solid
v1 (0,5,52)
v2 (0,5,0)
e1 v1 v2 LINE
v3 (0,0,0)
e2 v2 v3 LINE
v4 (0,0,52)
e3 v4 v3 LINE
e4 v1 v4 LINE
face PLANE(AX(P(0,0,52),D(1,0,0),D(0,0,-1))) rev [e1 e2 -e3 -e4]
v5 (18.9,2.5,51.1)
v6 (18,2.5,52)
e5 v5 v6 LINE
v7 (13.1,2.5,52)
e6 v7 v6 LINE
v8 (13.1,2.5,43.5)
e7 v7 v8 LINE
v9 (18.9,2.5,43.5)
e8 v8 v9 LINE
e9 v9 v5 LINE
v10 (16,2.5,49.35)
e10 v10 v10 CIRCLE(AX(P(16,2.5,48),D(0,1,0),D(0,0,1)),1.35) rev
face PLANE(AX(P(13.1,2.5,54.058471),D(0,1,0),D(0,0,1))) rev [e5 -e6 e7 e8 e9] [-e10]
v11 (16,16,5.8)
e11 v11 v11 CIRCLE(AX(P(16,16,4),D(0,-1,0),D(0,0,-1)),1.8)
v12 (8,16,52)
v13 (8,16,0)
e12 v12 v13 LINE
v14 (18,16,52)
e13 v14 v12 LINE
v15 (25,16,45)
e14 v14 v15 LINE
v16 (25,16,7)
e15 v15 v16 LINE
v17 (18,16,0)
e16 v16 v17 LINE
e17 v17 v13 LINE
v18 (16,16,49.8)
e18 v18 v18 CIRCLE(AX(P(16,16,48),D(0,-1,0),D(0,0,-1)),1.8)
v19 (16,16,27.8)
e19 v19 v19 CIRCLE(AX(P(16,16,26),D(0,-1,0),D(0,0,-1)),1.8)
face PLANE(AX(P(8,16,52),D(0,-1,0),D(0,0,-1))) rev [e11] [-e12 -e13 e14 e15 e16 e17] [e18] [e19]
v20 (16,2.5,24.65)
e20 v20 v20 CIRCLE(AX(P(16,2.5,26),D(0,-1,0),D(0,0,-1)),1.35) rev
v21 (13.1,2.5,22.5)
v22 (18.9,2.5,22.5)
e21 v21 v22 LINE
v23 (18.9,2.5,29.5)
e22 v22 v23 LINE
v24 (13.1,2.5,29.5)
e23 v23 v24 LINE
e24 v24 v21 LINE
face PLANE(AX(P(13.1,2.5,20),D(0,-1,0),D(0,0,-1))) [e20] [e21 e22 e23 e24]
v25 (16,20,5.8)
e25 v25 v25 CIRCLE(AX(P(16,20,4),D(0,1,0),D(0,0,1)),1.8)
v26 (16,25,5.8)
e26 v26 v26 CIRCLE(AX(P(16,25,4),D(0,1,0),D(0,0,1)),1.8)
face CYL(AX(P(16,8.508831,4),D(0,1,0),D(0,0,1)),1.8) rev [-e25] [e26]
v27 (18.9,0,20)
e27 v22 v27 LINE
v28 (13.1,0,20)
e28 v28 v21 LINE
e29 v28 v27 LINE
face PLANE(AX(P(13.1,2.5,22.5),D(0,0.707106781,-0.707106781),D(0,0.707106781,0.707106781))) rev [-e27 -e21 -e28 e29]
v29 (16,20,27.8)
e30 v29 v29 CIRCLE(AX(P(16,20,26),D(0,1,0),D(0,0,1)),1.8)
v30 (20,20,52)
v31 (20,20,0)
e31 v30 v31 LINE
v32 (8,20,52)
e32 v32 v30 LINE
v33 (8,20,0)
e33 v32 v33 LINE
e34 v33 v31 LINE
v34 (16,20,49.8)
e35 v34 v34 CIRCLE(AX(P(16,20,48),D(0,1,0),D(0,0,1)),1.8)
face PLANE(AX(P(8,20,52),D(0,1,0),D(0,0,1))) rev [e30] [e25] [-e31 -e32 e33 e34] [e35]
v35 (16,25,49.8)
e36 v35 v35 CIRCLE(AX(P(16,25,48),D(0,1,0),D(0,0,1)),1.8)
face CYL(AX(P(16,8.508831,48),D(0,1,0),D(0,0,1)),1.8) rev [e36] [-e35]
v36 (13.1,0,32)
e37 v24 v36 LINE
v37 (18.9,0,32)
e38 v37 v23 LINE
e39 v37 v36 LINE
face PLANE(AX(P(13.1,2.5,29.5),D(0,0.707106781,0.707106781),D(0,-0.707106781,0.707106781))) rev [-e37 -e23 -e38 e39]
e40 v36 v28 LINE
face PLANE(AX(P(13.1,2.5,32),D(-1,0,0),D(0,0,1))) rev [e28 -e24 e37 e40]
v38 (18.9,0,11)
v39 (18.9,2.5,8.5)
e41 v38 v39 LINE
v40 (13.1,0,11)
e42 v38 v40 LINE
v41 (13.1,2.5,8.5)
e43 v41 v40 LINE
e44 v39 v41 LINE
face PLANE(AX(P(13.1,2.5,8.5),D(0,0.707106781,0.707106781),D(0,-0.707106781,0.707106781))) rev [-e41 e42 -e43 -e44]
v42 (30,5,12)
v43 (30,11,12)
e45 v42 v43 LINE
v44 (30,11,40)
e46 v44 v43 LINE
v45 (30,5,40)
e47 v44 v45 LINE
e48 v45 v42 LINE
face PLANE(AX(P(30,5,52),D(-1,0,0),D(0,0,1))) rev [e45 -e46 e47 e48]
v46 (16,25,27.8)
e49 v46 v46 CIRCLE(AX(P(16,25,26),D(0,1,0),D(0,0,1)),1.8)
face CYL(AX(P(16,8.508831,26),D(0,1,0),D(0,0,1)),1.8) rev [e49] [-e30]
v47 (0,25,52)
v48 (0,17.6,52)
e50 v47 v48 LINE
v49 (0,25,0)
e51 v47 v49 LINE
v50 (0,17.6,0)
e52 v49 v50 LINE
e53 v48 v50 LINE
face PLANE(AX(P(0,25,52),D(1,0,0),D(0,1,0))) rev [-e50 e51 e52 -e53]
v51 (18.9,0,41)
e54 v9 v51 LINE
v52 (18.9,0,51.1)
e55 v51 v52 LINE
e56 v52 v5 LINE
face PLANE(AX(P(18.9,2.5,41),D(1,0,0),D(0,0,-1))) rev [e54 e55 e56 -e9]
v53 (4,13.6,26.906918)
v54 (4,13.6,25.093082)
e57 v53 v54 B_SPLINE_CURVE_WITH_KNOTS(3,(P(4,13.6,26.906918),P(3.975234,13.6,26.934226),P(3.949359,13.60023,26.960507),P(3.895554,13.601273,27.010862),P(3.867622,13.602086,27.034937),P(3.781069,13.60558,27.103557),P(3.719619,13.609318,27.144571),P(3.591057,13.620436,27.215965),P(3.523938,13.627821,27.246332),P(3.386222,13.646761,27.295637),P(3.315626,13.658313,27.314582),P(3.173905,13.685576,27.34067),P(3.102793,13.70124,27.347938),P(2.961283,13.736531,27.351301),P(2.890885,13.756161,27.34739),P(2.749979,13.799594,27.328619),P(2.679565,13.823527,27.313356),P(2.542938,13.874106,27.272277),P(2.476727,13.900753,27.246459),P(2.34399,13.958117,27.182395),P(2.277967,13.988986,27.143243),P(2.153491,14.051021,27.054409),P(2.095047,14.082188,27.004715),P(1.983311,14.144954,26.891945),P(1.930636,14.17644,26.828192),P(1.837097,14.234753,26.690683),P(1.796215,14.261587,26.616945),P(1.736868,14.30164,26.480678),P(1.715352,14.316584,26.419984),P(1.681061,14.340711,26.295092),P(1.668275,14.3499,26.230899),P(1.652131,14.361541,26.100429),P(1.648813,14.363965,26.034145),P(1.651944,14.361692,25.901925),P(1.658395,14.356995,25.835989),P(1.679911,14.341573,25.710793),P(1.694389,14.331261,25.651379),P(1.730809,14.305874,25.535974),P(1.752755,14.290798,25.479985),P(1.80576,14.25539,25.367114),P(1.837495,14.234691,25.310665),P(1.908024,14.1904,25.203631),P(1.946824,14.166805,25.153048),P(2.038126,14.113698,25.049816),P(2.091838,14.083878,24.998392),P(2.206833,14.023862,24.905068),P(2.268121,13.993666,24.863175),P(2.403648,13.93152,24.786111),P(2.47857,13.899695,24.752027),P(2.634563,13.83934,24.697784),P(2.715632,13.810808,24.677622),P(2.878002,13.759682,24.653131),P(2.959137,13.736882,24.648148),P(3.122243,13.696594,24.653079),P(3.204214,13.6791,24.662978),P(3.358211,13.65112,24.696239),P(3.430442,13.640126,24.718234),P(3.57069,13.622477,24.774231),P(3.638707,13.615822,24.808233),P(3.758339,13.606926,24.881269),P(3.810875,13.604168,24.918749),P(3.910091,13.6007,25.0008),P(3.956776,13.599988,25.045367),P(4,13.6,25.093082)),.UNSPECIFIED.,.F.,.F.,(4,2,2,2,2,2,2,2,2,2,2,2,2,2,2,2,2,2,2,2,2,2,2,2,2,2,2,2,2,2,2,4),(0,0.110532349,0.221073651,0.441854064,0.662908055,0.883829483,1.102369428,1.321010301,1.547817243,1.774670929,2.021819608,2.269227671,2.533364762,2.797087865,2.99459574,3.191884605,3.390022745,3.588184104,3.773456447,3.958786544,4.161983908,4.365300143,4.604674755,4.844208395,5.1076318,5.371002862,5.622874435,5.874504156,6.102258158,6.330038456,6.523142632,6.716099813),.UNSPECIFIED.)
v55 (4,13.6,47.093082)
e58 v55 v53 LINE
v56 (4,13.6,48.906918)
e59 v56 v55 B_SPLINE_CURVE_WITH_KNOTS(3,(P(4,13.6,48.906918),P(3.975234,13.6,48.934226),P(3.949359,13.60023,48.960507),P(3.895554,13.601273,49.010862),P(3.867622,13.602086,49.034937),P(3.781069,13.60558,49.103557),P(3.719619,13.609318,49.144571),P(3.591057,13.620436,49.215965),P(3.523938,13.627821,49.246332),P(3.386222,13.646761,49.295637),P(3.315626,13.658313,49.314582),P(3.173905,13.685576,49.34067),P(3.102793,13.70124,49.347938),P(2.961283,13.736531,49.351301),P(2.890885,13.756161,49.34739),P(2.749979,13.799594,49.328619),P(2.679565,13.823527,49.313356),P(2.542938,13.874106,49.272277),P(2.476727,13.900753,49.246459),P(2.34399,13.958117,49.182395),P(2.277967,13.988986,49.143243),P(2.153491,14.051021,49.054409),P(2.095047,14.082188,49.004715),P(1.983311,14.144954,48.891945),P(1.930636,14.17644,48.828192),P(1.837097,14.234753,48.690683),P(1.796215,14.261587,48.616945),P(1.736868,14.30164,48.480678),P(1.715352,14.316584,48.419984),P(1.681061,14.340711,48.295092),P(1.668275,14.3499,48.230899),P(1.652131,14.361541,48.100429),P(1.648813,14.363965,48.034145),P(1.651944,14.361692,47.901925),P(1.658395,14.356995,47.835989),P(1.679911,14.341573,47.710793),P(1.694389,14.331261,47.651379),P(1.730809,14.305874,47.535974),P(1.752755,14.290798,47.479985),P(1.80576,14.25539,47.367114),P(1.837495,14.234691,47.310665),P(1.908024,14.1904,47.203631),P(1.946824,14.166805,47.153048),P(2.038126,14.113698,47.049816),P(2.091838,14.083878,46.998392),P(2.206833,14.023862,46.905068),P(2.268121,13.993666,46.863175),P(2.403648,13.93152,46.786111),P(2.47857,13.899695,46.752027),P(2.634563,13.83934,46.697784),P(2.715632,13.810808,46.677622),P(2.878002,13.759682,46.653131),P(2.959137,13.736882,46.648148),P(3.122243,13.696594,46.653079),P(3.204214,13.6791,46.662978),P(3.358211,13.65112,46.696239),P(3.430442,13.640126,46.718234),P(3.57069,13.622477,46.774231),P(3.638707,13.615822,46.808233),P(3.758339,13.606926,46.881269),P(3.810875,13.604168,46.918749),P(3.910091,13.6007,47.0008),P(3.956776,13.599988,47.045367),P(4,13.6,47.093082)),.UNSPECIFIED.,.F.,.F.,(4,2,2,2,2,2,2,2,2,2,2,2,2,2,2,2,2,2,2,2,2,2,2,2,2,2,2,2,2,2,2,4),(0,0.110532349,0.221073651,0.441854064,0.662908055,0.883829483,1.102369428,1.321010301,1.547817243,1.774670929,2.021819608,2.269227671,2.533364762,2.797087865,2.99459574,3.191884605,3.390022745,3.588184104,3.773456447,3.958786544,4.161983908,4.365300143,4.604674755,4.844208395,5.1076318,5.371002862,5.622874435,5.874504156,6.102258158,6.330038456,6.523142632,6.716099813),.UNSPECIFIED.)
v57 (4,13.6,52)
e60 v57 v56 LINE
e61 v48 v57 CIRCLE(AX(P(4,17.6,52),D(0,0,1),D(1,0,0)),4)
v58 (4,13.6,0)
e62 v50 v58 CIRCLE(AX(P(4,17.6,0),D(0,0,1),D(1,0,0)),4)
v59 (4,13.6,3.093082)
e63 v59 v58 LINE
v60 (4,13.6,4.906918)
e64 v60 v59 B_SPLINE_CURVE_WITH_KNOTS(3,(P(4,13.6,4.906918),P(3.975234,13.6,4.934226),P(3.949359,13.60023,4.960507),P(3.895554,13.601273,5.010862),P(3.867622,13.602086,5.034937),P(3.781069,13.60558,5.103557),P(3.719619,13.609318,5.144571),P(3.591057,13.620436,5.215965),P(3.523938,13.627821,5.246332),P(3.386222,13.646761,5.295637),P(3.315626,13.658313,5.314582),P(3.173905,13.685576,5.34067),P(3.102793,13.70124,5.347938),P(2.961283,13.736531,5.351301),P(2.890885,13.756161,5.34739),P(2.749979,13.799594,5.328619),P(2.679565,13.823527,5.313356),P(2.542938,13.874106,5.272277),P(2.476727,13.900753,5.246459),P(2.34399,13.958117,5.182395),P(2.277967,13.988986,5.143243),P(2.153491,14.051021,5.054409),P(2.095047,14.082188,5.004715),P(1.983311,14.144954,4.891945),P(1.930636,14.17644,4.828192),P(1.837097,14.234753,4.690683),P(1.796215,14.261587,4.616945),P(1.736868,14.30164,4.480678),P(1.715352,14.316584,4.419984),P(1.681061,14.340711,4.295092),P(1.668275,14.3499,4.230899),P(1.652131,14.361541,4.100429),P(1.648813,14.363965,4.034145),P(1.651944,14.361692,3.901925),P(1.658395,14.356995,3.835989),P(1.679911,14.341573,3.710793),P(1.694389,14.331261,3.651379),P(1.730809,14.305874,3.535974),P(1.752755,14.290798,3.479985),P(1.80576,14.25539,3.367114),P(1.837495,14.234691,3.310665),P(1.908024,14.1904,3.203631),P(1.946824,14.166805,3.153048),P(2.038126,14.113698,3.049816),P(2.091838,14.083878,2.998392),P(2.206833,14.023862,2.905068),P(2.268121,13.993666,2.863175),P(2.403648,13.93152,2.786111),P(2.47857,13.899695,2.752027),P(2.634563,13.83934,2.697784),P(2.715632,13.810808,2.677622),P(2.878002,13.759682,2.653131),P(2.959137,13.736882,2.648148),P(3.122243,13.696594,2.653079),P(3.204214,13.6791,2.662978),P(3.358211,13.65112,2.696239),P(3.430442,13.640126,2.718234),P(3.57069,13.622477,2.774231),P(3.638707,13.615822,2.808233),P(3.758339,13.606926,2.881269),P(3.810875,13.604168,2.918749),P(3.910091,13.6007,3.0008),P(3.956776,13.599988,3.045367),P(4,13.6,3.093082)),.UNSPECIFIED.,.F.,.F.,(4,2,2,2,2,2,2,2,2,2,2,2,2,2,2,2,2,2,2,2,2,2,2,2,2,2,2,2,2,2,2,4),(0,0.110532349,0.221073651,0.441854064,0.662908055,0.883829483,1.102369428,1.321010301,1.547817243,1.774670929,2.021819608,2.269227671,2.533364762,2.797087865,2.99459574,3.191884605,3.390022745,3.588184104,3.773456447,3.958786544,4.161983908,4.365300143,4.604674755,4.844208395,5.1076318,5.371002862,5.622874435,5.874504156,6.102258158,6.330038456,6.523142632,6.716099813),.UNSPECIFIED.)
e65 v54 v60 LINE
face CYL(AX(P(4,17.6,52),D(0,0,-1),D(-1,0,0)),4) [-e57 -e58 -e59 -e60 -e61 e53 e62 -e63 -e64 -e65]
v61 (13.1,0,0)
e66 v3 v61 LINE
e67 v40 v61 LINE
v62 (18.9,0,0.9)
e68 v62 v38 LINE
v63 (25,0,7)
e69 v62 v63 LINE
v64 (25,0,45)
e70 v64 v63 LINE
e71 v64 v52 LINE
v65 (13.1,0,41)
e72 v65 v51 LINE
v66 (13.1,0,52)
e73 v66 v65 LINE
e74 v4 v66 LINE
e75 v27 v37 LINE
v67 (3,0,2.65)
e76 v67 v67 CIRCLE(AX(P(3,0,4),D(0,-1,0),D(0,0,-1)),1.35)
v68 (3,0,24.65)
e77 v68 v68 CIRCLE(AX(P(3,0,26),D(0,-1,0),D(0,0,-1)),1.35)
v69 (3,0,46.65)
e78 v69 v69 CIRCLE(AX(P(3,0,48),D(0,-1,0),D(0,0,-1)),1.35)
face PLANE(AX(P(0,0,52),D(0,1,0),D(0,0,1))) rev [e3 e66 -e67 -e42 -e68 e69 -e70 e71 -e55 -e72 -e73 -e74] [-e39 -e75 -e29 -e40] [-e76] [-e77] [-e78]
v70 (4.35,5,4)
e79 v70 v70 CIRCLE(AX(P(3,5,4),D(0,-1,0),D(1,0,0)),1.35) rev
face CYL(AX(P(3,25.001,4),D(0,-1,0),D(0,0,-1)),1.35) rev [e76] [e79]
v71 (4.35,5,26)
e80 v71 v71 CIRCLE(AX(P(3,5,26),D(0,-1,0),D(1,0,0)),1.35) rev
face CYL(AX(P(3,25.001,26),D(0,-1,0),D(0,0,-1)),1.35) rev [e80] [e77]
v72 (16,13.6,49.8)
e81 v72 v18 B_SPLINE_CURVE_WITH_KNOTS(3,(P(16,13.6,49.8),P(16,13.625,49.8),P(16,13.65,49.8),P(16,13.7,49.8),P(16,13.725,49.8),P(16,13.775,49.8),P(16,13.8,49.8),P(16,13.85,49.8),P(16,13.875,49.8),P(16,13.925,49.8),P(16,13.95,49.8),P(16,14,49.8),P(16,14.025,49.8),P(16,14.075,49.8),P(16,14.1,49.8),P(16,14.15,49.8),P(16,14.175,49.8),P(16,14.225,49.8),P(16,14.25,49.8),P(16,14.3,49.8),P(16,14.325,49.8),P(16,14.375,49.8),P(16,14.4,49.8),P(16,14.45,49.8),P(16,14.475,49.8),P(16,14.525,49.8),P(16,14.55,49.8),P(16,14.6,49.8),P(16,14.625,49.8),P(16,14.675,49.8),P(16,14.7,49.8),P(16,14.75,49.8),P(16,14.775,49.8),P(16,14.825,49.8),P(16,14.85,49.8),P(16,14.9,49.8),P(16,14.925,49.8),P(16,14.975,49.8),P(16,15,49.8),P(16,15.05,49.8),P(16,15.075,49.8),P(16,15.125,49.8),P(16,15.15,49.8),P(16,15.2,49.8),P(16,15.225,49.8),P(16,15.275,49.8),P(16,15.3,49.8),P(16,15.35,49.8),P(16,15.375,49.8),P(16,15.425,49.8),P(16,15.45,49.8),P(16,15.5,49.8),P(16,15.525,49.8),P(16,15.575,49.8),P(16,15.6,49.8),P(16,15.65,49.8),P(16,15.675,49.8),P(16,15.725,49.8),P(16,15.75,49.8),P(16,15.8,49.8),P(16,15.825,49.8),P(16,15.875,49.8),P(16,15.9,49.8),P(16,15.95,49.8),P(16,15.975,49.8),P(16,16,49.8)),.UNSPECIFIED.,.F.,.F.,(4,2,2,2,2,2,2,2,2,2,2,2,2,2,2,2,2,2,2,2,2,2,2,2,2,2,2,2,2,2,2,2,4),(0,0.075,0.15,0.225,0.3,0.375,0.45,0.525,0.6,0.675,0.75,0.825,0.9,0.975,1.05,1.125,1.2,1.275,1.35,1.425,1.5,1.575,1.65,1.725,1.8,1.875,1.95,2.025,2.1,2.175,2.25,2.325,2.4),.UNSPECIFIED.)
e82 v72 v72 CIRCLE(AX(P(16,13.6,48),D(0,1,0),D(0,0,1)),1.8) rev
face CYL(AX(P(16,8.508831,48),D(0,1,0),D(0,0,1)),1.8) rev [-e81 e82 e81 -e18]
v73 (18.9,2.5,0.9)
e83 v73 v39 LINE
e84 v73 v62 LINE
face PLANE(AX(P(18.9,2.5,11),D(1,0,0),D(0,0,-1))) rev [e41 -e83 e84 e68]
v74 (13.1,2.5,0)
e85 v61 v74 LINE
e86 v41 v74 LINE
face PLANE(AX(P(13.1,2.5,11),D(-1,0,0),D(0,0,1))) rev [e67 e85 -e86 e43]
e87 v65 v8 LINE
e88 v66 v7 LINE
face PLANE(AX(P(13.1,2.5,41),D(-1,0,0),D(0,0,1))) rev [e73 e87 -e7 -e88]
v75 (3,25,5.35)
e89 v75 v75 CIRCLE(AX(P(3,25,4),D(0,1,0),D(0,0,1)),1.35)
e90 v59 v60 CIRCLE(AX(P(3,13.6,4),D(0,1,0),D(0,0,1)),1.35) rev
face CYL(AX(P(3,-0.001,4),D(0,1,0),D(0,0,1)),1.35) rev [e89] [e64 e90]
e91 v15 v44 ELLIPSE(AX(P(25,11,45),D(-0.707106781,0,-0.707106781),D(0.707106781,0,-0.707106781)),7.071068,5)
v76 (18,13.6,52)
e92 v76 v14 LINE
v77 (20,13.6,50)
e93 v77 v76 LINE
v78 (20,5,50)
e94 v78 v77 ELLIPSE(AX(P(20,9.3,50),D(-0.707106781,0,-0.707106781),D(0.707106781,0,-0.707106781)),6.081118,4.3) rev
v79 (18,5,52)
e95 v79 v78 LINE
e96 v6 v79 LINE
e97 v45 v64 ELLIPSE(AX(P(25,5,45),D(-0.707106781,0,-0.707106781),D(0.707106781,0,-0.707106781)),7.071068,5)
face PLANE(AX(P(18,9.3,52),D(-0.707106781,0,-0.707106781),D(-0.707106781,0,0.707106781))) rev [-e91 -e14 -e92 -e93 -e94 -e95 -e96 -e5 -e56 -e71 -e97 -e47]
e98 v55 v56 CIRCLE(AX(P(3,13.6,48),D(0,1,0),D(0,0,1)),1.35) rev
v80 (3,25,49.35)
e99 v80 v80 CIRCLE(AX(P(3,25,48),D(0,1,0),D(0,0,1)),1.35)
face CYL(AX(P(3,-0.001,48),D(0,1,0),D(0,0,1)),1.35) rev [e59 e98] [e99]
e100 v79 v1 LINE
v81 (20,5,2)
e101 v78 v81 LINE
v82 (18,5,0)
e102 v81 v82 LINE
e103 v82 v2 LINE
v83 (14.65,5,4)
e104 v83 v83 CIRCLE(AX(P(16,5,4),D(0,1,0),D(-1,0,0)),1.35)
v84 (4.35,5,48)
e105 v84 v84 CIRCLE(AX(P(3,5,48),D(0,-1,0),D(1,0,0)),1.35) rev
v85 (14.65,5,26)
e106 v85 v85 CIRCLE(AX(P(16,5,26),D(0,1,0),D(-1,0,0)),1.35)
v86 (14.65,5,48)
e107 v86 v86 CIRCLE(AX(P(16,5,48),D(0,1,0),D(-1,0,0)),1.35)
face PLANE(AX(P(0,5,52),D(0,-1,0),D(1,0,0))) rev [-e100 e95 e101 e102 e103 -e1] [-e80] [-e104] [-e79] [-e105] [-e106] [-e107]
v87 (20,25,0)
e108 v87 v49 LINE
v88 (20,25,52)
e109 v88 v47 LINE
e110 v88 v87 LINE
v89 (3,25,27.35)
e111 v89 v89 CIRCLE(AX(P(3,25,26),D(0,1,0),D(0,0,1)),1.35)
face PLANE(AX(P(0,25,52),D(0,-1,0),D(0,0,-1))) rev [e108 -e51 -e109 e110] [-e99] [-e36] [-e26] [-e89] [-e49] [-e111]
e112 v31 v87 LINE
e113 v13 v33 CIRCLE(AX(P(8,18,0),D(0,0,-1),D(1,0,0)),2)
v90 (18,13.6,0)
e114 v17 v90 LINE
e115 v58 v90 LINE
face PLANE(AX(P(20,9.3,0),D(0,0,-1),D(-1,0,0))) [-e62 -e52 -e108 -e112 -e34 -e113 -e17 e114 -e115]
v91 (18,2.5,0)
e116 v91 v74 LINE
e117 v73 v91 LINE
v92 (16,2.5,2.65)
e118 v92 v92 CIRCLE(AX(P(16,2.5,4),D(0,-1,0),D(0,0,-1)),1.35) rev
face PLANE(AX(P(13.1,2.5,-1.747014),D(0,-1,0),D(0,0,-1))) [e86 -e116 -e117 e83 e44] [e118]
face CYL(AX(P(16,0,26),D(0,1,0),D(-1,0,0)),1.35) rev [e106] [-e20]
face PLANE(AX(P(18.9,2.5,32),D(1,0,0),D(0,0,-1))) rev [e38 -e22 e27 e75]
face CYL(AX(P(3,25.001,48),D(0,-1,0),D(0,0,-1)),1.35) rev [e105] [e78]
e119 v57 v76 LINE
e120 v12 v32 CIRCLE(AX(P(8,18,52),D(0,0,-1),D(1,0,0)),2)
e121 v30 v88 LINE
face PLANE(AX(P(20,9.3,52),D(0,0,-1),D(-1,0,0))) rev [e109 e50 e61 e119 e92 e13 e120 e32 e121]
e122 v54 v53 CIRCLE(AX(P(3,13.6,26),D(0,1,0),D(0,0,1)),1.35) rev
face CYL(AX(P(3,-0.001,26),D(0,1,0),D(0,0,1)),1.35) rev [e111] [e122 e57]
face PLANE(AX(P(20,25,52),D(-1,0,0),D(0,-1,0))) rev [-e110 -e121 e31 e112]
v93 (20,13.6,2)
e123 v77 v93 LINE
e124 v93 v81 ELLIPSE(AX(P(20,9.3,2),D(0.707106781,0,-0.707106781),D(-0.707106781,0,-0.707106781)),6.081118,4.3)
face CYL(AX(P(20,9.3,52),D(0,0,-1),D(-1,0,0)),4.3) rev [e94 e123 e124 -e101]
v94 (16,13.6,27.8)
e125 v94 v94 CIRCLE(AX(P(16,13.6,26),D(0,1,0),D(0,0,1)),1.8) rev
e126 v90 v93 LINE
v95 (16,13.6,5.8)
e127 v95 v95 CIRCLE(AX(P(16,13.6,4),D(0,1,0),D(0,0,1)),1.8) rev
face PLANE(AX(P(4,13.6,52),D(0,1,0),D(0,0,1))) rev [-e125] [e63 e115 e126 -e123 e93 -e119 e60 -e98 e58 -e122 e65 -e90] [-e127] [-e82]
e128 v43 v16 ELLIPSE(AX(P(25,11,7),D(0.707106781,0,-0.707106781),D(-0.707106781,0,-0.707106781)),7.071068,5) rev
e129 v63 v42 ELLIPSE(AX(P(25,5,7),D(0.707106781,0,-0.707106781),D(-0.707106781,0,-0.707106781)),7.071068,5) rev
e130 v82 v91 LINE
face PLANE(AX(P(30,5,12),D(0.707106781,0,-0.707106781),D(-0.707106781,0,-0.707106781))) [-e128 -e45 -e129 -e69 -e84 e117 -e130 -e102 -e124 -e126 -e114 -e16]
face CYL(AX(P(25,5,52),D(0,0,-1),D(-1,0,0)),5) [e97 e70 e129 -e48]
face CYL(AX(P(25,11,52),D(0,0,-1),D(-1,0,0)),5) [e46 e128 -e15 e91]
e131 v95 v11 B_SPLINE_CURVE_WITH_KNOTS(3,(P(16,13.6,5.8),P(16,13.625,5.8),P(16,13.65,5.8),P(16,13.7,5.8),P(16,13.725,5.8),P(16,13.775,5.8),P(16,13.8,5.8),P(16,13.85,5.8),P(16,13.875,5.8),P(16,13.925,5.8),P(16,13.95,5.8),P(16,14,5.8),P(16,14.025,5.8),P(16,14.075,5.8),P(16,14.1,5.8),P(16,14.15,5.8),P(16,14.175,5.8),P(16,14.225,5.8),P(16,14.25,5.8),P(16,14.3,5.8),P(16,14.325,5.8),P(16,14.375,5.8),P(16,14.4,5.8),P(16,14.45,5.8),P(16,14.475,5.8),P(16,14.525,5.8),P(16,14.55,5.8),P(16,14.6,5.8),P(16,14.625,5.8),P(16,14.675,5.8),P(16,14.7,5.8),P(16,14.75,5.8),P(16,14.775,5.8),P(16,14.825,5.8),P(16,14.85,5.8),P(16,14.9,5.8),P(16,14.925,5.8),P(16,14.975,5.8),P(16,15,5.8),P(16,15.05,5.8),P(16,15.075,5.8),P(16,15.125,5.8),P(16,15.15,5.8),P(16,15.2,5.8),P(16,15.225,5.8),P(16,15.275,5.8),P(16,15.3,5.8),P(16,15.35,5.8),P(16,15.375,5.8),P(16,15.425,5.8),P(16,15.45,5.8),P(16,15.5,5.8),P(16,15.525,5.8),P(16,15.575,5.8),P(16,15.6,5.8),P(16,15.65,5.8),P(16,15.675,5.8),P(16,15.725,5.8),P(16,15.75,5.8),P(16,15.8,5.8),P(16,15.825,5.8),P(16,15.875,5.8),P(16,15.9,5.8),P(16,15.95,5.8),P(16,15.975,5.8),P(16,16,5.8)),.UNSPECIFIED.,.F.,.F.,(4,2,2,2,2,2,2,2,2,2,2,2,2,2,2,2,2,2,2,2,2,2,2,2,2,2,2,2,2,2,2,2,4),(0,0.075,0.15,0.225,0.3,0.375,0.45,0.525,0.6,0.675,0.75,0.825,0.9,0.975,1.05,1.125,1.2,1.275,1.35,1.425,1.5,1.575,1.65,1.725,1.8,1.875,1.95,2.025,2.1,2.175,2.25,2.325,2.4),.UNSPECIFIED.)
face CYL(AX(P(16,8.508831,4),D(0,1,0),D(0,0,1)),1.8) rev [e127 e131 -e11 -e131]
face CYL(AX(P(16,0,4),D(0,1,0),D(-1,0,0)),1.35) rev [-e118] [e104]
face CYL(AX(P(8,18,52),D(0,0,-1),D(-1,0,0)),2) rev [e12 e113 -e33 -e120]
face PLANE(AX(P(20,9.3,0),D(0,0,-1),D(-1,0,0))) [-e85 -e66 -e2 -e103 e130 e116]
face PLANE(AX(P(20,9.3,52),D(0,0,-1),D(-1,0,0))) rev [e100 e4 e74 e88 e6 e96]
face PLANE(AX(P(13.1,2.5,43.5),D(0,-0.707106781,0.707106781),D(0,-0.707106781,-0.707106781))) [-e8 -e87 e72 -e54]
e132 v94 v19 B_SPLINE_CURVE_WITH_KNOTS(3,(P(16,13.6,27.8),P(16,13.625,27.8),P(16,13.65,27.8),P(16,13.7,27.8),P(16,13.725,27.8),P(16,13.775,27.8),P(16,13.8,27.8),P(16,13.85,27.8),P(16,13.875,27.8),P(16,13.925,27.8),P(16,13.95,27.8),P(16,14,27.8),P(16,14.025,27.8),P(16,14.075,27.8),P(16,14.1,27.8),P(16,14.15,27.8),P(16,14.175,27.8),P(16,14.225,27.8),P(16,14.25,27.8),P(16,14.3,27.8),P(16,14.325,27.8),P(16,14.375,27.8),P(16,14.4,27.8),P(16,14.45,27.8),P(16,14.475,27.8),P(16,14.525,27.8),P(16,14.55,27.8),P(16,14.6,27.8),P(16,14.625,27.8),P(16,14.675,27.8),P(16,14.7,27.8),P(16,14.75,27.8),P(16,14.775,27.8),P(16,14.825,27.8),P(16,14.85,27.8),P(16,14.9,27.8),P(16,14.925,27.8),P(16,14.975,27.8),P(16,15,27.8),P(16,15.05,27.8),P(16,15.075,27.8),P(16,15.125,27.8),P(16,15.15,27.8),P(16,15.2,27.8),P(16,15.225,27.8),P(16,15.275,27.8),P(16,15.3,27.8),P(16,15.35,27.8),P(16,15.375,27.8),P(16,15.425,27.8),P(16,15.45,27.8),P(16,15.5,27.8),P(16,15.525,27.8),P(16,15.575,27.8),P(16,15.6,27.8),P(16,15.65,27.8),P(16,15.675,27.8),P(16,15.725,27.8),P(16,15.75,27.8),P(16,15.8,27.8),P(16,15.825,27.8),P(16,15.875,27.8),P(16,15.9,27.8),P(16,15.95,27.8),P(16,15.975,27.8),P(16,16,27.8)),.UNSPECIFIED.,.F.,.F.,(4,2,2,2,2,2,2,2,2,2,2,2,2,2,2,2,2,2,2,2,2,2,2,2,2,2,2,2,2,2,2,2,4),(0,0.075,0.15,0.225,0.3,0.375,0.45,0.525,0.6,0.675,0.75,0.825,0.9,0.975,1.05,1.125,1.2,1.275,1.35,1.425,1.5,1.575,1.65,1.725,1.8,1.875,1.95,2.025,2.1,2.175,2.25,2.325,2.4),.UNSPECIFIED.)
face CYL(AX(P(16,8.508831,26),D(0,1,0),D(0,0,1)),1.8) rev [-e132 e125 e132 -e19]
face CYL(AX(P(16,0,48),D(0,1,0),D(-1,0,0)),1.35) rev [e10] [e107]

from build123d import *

# Parameters (mm, degrees)
BOSS_EXTRUDE1_DEPTH = 52
CUT_EXTRUDE1_REACH  = 67.031
SKETCH2_R           = 1.8
CUT_EXTRUDE3_REACH  = 67.031
SKETCH4_R           = 1.35
CUT_EXTRUDE4_REACH  = 67.031
SKETCH5_R           = 1.35
SKETCH6_R           = 1.35
CUT_EXTRUDE5_DEPTH  = 64.277168192
CHAMFER3_SIZE       = 12
LPATTERN3_COUNT     = 2
LPATTERN3_PITCH     = 22
LPATTERN3_COL_COUNT = 2
LPATTERN3_COL_PITCH = 22
SKETCH7_W           = 5.8
SKETCH7_H           = 12
SKETCH7_H_2         = 12.747013555
SKETCH7_H_3         = 13.058470869
CUT_EXTRUDE6_DEPTH  = 2.5
CHAMFER4_SIZE       = 2.5


# Some blends are built 0.0001 mm under size
with BuildPart() as part:
    # Sketch1 → Boss-Extrude1 (new body)
    with BuildSketch(Plane.XY):
        with BuildLine():
            Line((0, 0), (25, 0))
            ThreePointArc((25, 0), (28.535533906, 1.464466094), (30, 5))
            Line((30, 5), (30, 11))
            ThreePointArc((30, 11), (28.535533906, 14.535533906), (25, 16))
            Line((25, 16), (8, 16))
            ThreePointArc((8, 16), (6, 18), (8, 20))
            Line((8, 20), (20, 20))
            Line((20, 20), (20, 25))
            Line((20, 25), (0, 25))
            Line((0, 25), (0, 17.6))
            ThreePointArc((0, 17.6), (1.171572875, 14.771572875), (4, 13.6))
            Line((4, 13.6), (20, 13.6))
            ThreePointArc((20, 13.6), (24.3, 9.3), (20, 5))
            Line((20, 5), (0, 5))
            Line((0, 5), (0, 0))
        make_face()
    extrude(amount=BOSS_EXTRUDE1_DEPTH)

    # Cut-Extrude1: up to this face of the body (flat: up to its plane)
    cut_extrude1_end = Plane(part.part.faces().sort_by_distance((12, 13.6, 26))[0])
    # Sketch2 → Cut-Extrude1 (cut, up to the picked face)
    with BuildSketch(Plane(origin=(0, 25, 0), x_dir=(1, 0, 0), z_dir=(0, 1, 0)), mode=Mode.PRIVATE) as cut_extrude1_sk1:
        with Locations(Location((16, -26, 0), (0, 0, 270))):
            Circle(SKETCH2_R)
    cut_extrude1_tool1 = split(extrude(cut_extrude1_sk1.sketch, amount=-CUT_EXTRUDE1_REACH, mode=Mode.PRIVATE), bisect_by=cut_extrude1_end, keep=Keep.BOTH, mode=Mode.PRIVATE)
    cut_extrude1 = cut_extrude1_tool1.solids().sort_by(Axis((16, 25, 26), (0, -1, 0)))[0]
    add(cut_extrude1, mode=Mode.SUBTRACT)

    # Sketch4 → Cut-Extrude3 (cut, up to next)
    with BuildSketch(Plane(origin=(0, 25, 0), x_dir=(1, 0, 0), z_dir=(0, 1, 0)), mode=Mode.PRIVATE) as cut_extrude3_sk1:
        with Locations(Location((3, -26, 0), (0, 0, 270))):
            Circle(SKETCH4_R)
    cut_extrude3_tool1 = extrude(cut_extrude3_sk1.sketch, amount=-CUT_EXTRUDE3_REACH, mode=Mode.PRIVATE) & part.part
    cut_extrude3 = cut_extrude3_tool1.solids().sort_by_distance((3, 25, 26))[0]
    add(cut_extrude3, mode=Mode.SUBTRACT)

    # Sketch5 → Cut-Extrude4 (cut, up to next)
    with BuildSketch(Plane.XZ, mode=Mode.PRIVATE) as cut_extrude4_sk1:
        with Locations(Location((3, 26, 0), (0, 0, 90))):
            Circle(SKETCH5_R)
    cut_extrude4_tool1 = extrude(cut_extrude4_sk1.sketch, amount=-CUT_EXTRUDE4_REACH, mode=Mode.PRIVATE) & part.part
    cut_extrude4 = cut_extrude4_tool1.solids().sort_by_distance((3, 0, 26))[0]
    add(cut_extrude4, mode=Mode.SUBTRACT)

    # Sketch6 → Cut-Extrude5 (cut, through all)
    with BuildSketch(Plane(origin=(0, 5, 0), x_dir=(1, 0, 0), z_dir=(0, 1, 0))):
        with Locations(Location((16, -26, 0), (0, 0, 180))):
            Circle(SKETCH6_R)
    cut_extrude5 = extrude(amount=-CUT_EXTRUDE5_DEPTH, mode=Mode.SUBTRACT)

    # Chamfer3
    # the kernel refuses this chamfer: 12 mm, written as the material it takes off along each edge
    with BuildSketch(Plane(origin=(30, -25.860195856, 0), x_dir=(-0.9996219169112969, 0, -0.027495876610586372), z_dir=(0, 1, 0))) as chamfer3_piece_1_section:
        Polygon((CHAMFER3_SIZE * 0.999621916911, CHAMFER3_SIZE * 0.0274958766106), (-CHAMFER3_SIZE * 0.0274958766106, CHAMFER3_SIZE * 0.999621916911), (0, 0), align=None)
    chamfer3_piece_1 = extrude(amount=67.720391711, mode=Mode.PRIVATE)
    chamfer3_piece_1 = split(chamfer3_piece_1, bisect_by=Plane(origin=(19.333333334, 20, 0.666666666), z_dir=(0, -1, 0)), keep=Keep.TOP, mode=Mode.PRIVATE)
    add(chamfer3_piece_1, mode=Mode.SUBTRACT)
    with BuildSketch(Plane(origin=(30, -25.860195856, 52), x_dir=(-0.9996219169112969, 0, 0.027495876610586202), z_dir=(0, 1, 0))) as chamfer3_piece_2_section:
        Polygon((CHAMFER3_SIZE * 0.999621916911, -CHAMFER3_SIZE * 0.0274958766106), (-CHAMFER3_SIZE * 0.0274958766106, -CHAMFER3_SIZE * 0.999621916911), (0, 0), align=None)
    chamfer3_piece_2 = extrude(amount=67.720391711, mode=Mode.PRIVATE)
    chamfer3_piece_2 = split(chamfer3_piece_2, bisect_by=Plane(origin=(19.333333334, 20, 51.333333333), z_dir=(0, -1, 0)), keep=Keep.TOP, mode=Mode.PRIVATE)
    add(chamfer3_piece_2, mode=Mode.SUBTRACT)

    # LPattern3: Cut-Extrude1, Cut-Extrude3, Cut-Extrude4, Cut-Extrude5 ×2
    with Locations(*[(0, 0, i * LPATTERN3_PITCH) for i in range(1, LPATTERN3_COUNT)]):
        add(cut_extrude1, mode=Mode.SUBTRACT)
        add(cut_extrude3, mode=Mode.SUBTRACT)
        add(cut_extrude4, mode=Mode.SUBTRACT)
        add(cut_extrude5, mode=Mode.SUBTRACT)

    # LPattern3 col: Cut-Extrude1, Cut-Extrude3, Cut-Extrude4, Cut-Extrude5 ×2
    with Locations(*[(0, 0, -i * LPATTERN3_COL_PITCH) for i in range(1, LPATTERN3_COL_COUNT)]):
        add(cut_extrude1, mode=Mode.SUBTRACT)
        add(cut_extrude3, mode=Mode.SUBTRACT)
        add(cut_extrude4, mode=Mode.SUBTRACT)
        add(cut_extrude5, mode=Mode.SUBTRACT)

    # Sketch7 → Cut-Extrude6 (cut)
    with BuildSketch(Plane.XZ):
        with Locations((16, 26)):
            Rectangle(SKETCH7_W, SKETCH7_H)
        with Locations((16, 4.626493222)):
            Rectangle(SKETCH7_W, SKETCH7_H_2)
        with Locations((16, 47.529235435)):
            Rectangle(SKETCH7_W, SKETCH7_H_3)
    extrude(amount=-CUT_EXTRUDE6_DEPTH, mode=Mode.SUBTRACT)

    # Chamfer4
    chamfer4_edges = [part.edges().sort_by_distance(p)[0] for p in [
        (16, 2.5, 41),
        (16, 2.5, 20),
        (16, 2.5, 32),
        (16, 2.5, 11),
    ]]
    chamfer(chamfer4_edges, length=CHAMFER4_SIZE - 0.0001)  # a hair under: the kernel refuses the full size


solid = part.part
